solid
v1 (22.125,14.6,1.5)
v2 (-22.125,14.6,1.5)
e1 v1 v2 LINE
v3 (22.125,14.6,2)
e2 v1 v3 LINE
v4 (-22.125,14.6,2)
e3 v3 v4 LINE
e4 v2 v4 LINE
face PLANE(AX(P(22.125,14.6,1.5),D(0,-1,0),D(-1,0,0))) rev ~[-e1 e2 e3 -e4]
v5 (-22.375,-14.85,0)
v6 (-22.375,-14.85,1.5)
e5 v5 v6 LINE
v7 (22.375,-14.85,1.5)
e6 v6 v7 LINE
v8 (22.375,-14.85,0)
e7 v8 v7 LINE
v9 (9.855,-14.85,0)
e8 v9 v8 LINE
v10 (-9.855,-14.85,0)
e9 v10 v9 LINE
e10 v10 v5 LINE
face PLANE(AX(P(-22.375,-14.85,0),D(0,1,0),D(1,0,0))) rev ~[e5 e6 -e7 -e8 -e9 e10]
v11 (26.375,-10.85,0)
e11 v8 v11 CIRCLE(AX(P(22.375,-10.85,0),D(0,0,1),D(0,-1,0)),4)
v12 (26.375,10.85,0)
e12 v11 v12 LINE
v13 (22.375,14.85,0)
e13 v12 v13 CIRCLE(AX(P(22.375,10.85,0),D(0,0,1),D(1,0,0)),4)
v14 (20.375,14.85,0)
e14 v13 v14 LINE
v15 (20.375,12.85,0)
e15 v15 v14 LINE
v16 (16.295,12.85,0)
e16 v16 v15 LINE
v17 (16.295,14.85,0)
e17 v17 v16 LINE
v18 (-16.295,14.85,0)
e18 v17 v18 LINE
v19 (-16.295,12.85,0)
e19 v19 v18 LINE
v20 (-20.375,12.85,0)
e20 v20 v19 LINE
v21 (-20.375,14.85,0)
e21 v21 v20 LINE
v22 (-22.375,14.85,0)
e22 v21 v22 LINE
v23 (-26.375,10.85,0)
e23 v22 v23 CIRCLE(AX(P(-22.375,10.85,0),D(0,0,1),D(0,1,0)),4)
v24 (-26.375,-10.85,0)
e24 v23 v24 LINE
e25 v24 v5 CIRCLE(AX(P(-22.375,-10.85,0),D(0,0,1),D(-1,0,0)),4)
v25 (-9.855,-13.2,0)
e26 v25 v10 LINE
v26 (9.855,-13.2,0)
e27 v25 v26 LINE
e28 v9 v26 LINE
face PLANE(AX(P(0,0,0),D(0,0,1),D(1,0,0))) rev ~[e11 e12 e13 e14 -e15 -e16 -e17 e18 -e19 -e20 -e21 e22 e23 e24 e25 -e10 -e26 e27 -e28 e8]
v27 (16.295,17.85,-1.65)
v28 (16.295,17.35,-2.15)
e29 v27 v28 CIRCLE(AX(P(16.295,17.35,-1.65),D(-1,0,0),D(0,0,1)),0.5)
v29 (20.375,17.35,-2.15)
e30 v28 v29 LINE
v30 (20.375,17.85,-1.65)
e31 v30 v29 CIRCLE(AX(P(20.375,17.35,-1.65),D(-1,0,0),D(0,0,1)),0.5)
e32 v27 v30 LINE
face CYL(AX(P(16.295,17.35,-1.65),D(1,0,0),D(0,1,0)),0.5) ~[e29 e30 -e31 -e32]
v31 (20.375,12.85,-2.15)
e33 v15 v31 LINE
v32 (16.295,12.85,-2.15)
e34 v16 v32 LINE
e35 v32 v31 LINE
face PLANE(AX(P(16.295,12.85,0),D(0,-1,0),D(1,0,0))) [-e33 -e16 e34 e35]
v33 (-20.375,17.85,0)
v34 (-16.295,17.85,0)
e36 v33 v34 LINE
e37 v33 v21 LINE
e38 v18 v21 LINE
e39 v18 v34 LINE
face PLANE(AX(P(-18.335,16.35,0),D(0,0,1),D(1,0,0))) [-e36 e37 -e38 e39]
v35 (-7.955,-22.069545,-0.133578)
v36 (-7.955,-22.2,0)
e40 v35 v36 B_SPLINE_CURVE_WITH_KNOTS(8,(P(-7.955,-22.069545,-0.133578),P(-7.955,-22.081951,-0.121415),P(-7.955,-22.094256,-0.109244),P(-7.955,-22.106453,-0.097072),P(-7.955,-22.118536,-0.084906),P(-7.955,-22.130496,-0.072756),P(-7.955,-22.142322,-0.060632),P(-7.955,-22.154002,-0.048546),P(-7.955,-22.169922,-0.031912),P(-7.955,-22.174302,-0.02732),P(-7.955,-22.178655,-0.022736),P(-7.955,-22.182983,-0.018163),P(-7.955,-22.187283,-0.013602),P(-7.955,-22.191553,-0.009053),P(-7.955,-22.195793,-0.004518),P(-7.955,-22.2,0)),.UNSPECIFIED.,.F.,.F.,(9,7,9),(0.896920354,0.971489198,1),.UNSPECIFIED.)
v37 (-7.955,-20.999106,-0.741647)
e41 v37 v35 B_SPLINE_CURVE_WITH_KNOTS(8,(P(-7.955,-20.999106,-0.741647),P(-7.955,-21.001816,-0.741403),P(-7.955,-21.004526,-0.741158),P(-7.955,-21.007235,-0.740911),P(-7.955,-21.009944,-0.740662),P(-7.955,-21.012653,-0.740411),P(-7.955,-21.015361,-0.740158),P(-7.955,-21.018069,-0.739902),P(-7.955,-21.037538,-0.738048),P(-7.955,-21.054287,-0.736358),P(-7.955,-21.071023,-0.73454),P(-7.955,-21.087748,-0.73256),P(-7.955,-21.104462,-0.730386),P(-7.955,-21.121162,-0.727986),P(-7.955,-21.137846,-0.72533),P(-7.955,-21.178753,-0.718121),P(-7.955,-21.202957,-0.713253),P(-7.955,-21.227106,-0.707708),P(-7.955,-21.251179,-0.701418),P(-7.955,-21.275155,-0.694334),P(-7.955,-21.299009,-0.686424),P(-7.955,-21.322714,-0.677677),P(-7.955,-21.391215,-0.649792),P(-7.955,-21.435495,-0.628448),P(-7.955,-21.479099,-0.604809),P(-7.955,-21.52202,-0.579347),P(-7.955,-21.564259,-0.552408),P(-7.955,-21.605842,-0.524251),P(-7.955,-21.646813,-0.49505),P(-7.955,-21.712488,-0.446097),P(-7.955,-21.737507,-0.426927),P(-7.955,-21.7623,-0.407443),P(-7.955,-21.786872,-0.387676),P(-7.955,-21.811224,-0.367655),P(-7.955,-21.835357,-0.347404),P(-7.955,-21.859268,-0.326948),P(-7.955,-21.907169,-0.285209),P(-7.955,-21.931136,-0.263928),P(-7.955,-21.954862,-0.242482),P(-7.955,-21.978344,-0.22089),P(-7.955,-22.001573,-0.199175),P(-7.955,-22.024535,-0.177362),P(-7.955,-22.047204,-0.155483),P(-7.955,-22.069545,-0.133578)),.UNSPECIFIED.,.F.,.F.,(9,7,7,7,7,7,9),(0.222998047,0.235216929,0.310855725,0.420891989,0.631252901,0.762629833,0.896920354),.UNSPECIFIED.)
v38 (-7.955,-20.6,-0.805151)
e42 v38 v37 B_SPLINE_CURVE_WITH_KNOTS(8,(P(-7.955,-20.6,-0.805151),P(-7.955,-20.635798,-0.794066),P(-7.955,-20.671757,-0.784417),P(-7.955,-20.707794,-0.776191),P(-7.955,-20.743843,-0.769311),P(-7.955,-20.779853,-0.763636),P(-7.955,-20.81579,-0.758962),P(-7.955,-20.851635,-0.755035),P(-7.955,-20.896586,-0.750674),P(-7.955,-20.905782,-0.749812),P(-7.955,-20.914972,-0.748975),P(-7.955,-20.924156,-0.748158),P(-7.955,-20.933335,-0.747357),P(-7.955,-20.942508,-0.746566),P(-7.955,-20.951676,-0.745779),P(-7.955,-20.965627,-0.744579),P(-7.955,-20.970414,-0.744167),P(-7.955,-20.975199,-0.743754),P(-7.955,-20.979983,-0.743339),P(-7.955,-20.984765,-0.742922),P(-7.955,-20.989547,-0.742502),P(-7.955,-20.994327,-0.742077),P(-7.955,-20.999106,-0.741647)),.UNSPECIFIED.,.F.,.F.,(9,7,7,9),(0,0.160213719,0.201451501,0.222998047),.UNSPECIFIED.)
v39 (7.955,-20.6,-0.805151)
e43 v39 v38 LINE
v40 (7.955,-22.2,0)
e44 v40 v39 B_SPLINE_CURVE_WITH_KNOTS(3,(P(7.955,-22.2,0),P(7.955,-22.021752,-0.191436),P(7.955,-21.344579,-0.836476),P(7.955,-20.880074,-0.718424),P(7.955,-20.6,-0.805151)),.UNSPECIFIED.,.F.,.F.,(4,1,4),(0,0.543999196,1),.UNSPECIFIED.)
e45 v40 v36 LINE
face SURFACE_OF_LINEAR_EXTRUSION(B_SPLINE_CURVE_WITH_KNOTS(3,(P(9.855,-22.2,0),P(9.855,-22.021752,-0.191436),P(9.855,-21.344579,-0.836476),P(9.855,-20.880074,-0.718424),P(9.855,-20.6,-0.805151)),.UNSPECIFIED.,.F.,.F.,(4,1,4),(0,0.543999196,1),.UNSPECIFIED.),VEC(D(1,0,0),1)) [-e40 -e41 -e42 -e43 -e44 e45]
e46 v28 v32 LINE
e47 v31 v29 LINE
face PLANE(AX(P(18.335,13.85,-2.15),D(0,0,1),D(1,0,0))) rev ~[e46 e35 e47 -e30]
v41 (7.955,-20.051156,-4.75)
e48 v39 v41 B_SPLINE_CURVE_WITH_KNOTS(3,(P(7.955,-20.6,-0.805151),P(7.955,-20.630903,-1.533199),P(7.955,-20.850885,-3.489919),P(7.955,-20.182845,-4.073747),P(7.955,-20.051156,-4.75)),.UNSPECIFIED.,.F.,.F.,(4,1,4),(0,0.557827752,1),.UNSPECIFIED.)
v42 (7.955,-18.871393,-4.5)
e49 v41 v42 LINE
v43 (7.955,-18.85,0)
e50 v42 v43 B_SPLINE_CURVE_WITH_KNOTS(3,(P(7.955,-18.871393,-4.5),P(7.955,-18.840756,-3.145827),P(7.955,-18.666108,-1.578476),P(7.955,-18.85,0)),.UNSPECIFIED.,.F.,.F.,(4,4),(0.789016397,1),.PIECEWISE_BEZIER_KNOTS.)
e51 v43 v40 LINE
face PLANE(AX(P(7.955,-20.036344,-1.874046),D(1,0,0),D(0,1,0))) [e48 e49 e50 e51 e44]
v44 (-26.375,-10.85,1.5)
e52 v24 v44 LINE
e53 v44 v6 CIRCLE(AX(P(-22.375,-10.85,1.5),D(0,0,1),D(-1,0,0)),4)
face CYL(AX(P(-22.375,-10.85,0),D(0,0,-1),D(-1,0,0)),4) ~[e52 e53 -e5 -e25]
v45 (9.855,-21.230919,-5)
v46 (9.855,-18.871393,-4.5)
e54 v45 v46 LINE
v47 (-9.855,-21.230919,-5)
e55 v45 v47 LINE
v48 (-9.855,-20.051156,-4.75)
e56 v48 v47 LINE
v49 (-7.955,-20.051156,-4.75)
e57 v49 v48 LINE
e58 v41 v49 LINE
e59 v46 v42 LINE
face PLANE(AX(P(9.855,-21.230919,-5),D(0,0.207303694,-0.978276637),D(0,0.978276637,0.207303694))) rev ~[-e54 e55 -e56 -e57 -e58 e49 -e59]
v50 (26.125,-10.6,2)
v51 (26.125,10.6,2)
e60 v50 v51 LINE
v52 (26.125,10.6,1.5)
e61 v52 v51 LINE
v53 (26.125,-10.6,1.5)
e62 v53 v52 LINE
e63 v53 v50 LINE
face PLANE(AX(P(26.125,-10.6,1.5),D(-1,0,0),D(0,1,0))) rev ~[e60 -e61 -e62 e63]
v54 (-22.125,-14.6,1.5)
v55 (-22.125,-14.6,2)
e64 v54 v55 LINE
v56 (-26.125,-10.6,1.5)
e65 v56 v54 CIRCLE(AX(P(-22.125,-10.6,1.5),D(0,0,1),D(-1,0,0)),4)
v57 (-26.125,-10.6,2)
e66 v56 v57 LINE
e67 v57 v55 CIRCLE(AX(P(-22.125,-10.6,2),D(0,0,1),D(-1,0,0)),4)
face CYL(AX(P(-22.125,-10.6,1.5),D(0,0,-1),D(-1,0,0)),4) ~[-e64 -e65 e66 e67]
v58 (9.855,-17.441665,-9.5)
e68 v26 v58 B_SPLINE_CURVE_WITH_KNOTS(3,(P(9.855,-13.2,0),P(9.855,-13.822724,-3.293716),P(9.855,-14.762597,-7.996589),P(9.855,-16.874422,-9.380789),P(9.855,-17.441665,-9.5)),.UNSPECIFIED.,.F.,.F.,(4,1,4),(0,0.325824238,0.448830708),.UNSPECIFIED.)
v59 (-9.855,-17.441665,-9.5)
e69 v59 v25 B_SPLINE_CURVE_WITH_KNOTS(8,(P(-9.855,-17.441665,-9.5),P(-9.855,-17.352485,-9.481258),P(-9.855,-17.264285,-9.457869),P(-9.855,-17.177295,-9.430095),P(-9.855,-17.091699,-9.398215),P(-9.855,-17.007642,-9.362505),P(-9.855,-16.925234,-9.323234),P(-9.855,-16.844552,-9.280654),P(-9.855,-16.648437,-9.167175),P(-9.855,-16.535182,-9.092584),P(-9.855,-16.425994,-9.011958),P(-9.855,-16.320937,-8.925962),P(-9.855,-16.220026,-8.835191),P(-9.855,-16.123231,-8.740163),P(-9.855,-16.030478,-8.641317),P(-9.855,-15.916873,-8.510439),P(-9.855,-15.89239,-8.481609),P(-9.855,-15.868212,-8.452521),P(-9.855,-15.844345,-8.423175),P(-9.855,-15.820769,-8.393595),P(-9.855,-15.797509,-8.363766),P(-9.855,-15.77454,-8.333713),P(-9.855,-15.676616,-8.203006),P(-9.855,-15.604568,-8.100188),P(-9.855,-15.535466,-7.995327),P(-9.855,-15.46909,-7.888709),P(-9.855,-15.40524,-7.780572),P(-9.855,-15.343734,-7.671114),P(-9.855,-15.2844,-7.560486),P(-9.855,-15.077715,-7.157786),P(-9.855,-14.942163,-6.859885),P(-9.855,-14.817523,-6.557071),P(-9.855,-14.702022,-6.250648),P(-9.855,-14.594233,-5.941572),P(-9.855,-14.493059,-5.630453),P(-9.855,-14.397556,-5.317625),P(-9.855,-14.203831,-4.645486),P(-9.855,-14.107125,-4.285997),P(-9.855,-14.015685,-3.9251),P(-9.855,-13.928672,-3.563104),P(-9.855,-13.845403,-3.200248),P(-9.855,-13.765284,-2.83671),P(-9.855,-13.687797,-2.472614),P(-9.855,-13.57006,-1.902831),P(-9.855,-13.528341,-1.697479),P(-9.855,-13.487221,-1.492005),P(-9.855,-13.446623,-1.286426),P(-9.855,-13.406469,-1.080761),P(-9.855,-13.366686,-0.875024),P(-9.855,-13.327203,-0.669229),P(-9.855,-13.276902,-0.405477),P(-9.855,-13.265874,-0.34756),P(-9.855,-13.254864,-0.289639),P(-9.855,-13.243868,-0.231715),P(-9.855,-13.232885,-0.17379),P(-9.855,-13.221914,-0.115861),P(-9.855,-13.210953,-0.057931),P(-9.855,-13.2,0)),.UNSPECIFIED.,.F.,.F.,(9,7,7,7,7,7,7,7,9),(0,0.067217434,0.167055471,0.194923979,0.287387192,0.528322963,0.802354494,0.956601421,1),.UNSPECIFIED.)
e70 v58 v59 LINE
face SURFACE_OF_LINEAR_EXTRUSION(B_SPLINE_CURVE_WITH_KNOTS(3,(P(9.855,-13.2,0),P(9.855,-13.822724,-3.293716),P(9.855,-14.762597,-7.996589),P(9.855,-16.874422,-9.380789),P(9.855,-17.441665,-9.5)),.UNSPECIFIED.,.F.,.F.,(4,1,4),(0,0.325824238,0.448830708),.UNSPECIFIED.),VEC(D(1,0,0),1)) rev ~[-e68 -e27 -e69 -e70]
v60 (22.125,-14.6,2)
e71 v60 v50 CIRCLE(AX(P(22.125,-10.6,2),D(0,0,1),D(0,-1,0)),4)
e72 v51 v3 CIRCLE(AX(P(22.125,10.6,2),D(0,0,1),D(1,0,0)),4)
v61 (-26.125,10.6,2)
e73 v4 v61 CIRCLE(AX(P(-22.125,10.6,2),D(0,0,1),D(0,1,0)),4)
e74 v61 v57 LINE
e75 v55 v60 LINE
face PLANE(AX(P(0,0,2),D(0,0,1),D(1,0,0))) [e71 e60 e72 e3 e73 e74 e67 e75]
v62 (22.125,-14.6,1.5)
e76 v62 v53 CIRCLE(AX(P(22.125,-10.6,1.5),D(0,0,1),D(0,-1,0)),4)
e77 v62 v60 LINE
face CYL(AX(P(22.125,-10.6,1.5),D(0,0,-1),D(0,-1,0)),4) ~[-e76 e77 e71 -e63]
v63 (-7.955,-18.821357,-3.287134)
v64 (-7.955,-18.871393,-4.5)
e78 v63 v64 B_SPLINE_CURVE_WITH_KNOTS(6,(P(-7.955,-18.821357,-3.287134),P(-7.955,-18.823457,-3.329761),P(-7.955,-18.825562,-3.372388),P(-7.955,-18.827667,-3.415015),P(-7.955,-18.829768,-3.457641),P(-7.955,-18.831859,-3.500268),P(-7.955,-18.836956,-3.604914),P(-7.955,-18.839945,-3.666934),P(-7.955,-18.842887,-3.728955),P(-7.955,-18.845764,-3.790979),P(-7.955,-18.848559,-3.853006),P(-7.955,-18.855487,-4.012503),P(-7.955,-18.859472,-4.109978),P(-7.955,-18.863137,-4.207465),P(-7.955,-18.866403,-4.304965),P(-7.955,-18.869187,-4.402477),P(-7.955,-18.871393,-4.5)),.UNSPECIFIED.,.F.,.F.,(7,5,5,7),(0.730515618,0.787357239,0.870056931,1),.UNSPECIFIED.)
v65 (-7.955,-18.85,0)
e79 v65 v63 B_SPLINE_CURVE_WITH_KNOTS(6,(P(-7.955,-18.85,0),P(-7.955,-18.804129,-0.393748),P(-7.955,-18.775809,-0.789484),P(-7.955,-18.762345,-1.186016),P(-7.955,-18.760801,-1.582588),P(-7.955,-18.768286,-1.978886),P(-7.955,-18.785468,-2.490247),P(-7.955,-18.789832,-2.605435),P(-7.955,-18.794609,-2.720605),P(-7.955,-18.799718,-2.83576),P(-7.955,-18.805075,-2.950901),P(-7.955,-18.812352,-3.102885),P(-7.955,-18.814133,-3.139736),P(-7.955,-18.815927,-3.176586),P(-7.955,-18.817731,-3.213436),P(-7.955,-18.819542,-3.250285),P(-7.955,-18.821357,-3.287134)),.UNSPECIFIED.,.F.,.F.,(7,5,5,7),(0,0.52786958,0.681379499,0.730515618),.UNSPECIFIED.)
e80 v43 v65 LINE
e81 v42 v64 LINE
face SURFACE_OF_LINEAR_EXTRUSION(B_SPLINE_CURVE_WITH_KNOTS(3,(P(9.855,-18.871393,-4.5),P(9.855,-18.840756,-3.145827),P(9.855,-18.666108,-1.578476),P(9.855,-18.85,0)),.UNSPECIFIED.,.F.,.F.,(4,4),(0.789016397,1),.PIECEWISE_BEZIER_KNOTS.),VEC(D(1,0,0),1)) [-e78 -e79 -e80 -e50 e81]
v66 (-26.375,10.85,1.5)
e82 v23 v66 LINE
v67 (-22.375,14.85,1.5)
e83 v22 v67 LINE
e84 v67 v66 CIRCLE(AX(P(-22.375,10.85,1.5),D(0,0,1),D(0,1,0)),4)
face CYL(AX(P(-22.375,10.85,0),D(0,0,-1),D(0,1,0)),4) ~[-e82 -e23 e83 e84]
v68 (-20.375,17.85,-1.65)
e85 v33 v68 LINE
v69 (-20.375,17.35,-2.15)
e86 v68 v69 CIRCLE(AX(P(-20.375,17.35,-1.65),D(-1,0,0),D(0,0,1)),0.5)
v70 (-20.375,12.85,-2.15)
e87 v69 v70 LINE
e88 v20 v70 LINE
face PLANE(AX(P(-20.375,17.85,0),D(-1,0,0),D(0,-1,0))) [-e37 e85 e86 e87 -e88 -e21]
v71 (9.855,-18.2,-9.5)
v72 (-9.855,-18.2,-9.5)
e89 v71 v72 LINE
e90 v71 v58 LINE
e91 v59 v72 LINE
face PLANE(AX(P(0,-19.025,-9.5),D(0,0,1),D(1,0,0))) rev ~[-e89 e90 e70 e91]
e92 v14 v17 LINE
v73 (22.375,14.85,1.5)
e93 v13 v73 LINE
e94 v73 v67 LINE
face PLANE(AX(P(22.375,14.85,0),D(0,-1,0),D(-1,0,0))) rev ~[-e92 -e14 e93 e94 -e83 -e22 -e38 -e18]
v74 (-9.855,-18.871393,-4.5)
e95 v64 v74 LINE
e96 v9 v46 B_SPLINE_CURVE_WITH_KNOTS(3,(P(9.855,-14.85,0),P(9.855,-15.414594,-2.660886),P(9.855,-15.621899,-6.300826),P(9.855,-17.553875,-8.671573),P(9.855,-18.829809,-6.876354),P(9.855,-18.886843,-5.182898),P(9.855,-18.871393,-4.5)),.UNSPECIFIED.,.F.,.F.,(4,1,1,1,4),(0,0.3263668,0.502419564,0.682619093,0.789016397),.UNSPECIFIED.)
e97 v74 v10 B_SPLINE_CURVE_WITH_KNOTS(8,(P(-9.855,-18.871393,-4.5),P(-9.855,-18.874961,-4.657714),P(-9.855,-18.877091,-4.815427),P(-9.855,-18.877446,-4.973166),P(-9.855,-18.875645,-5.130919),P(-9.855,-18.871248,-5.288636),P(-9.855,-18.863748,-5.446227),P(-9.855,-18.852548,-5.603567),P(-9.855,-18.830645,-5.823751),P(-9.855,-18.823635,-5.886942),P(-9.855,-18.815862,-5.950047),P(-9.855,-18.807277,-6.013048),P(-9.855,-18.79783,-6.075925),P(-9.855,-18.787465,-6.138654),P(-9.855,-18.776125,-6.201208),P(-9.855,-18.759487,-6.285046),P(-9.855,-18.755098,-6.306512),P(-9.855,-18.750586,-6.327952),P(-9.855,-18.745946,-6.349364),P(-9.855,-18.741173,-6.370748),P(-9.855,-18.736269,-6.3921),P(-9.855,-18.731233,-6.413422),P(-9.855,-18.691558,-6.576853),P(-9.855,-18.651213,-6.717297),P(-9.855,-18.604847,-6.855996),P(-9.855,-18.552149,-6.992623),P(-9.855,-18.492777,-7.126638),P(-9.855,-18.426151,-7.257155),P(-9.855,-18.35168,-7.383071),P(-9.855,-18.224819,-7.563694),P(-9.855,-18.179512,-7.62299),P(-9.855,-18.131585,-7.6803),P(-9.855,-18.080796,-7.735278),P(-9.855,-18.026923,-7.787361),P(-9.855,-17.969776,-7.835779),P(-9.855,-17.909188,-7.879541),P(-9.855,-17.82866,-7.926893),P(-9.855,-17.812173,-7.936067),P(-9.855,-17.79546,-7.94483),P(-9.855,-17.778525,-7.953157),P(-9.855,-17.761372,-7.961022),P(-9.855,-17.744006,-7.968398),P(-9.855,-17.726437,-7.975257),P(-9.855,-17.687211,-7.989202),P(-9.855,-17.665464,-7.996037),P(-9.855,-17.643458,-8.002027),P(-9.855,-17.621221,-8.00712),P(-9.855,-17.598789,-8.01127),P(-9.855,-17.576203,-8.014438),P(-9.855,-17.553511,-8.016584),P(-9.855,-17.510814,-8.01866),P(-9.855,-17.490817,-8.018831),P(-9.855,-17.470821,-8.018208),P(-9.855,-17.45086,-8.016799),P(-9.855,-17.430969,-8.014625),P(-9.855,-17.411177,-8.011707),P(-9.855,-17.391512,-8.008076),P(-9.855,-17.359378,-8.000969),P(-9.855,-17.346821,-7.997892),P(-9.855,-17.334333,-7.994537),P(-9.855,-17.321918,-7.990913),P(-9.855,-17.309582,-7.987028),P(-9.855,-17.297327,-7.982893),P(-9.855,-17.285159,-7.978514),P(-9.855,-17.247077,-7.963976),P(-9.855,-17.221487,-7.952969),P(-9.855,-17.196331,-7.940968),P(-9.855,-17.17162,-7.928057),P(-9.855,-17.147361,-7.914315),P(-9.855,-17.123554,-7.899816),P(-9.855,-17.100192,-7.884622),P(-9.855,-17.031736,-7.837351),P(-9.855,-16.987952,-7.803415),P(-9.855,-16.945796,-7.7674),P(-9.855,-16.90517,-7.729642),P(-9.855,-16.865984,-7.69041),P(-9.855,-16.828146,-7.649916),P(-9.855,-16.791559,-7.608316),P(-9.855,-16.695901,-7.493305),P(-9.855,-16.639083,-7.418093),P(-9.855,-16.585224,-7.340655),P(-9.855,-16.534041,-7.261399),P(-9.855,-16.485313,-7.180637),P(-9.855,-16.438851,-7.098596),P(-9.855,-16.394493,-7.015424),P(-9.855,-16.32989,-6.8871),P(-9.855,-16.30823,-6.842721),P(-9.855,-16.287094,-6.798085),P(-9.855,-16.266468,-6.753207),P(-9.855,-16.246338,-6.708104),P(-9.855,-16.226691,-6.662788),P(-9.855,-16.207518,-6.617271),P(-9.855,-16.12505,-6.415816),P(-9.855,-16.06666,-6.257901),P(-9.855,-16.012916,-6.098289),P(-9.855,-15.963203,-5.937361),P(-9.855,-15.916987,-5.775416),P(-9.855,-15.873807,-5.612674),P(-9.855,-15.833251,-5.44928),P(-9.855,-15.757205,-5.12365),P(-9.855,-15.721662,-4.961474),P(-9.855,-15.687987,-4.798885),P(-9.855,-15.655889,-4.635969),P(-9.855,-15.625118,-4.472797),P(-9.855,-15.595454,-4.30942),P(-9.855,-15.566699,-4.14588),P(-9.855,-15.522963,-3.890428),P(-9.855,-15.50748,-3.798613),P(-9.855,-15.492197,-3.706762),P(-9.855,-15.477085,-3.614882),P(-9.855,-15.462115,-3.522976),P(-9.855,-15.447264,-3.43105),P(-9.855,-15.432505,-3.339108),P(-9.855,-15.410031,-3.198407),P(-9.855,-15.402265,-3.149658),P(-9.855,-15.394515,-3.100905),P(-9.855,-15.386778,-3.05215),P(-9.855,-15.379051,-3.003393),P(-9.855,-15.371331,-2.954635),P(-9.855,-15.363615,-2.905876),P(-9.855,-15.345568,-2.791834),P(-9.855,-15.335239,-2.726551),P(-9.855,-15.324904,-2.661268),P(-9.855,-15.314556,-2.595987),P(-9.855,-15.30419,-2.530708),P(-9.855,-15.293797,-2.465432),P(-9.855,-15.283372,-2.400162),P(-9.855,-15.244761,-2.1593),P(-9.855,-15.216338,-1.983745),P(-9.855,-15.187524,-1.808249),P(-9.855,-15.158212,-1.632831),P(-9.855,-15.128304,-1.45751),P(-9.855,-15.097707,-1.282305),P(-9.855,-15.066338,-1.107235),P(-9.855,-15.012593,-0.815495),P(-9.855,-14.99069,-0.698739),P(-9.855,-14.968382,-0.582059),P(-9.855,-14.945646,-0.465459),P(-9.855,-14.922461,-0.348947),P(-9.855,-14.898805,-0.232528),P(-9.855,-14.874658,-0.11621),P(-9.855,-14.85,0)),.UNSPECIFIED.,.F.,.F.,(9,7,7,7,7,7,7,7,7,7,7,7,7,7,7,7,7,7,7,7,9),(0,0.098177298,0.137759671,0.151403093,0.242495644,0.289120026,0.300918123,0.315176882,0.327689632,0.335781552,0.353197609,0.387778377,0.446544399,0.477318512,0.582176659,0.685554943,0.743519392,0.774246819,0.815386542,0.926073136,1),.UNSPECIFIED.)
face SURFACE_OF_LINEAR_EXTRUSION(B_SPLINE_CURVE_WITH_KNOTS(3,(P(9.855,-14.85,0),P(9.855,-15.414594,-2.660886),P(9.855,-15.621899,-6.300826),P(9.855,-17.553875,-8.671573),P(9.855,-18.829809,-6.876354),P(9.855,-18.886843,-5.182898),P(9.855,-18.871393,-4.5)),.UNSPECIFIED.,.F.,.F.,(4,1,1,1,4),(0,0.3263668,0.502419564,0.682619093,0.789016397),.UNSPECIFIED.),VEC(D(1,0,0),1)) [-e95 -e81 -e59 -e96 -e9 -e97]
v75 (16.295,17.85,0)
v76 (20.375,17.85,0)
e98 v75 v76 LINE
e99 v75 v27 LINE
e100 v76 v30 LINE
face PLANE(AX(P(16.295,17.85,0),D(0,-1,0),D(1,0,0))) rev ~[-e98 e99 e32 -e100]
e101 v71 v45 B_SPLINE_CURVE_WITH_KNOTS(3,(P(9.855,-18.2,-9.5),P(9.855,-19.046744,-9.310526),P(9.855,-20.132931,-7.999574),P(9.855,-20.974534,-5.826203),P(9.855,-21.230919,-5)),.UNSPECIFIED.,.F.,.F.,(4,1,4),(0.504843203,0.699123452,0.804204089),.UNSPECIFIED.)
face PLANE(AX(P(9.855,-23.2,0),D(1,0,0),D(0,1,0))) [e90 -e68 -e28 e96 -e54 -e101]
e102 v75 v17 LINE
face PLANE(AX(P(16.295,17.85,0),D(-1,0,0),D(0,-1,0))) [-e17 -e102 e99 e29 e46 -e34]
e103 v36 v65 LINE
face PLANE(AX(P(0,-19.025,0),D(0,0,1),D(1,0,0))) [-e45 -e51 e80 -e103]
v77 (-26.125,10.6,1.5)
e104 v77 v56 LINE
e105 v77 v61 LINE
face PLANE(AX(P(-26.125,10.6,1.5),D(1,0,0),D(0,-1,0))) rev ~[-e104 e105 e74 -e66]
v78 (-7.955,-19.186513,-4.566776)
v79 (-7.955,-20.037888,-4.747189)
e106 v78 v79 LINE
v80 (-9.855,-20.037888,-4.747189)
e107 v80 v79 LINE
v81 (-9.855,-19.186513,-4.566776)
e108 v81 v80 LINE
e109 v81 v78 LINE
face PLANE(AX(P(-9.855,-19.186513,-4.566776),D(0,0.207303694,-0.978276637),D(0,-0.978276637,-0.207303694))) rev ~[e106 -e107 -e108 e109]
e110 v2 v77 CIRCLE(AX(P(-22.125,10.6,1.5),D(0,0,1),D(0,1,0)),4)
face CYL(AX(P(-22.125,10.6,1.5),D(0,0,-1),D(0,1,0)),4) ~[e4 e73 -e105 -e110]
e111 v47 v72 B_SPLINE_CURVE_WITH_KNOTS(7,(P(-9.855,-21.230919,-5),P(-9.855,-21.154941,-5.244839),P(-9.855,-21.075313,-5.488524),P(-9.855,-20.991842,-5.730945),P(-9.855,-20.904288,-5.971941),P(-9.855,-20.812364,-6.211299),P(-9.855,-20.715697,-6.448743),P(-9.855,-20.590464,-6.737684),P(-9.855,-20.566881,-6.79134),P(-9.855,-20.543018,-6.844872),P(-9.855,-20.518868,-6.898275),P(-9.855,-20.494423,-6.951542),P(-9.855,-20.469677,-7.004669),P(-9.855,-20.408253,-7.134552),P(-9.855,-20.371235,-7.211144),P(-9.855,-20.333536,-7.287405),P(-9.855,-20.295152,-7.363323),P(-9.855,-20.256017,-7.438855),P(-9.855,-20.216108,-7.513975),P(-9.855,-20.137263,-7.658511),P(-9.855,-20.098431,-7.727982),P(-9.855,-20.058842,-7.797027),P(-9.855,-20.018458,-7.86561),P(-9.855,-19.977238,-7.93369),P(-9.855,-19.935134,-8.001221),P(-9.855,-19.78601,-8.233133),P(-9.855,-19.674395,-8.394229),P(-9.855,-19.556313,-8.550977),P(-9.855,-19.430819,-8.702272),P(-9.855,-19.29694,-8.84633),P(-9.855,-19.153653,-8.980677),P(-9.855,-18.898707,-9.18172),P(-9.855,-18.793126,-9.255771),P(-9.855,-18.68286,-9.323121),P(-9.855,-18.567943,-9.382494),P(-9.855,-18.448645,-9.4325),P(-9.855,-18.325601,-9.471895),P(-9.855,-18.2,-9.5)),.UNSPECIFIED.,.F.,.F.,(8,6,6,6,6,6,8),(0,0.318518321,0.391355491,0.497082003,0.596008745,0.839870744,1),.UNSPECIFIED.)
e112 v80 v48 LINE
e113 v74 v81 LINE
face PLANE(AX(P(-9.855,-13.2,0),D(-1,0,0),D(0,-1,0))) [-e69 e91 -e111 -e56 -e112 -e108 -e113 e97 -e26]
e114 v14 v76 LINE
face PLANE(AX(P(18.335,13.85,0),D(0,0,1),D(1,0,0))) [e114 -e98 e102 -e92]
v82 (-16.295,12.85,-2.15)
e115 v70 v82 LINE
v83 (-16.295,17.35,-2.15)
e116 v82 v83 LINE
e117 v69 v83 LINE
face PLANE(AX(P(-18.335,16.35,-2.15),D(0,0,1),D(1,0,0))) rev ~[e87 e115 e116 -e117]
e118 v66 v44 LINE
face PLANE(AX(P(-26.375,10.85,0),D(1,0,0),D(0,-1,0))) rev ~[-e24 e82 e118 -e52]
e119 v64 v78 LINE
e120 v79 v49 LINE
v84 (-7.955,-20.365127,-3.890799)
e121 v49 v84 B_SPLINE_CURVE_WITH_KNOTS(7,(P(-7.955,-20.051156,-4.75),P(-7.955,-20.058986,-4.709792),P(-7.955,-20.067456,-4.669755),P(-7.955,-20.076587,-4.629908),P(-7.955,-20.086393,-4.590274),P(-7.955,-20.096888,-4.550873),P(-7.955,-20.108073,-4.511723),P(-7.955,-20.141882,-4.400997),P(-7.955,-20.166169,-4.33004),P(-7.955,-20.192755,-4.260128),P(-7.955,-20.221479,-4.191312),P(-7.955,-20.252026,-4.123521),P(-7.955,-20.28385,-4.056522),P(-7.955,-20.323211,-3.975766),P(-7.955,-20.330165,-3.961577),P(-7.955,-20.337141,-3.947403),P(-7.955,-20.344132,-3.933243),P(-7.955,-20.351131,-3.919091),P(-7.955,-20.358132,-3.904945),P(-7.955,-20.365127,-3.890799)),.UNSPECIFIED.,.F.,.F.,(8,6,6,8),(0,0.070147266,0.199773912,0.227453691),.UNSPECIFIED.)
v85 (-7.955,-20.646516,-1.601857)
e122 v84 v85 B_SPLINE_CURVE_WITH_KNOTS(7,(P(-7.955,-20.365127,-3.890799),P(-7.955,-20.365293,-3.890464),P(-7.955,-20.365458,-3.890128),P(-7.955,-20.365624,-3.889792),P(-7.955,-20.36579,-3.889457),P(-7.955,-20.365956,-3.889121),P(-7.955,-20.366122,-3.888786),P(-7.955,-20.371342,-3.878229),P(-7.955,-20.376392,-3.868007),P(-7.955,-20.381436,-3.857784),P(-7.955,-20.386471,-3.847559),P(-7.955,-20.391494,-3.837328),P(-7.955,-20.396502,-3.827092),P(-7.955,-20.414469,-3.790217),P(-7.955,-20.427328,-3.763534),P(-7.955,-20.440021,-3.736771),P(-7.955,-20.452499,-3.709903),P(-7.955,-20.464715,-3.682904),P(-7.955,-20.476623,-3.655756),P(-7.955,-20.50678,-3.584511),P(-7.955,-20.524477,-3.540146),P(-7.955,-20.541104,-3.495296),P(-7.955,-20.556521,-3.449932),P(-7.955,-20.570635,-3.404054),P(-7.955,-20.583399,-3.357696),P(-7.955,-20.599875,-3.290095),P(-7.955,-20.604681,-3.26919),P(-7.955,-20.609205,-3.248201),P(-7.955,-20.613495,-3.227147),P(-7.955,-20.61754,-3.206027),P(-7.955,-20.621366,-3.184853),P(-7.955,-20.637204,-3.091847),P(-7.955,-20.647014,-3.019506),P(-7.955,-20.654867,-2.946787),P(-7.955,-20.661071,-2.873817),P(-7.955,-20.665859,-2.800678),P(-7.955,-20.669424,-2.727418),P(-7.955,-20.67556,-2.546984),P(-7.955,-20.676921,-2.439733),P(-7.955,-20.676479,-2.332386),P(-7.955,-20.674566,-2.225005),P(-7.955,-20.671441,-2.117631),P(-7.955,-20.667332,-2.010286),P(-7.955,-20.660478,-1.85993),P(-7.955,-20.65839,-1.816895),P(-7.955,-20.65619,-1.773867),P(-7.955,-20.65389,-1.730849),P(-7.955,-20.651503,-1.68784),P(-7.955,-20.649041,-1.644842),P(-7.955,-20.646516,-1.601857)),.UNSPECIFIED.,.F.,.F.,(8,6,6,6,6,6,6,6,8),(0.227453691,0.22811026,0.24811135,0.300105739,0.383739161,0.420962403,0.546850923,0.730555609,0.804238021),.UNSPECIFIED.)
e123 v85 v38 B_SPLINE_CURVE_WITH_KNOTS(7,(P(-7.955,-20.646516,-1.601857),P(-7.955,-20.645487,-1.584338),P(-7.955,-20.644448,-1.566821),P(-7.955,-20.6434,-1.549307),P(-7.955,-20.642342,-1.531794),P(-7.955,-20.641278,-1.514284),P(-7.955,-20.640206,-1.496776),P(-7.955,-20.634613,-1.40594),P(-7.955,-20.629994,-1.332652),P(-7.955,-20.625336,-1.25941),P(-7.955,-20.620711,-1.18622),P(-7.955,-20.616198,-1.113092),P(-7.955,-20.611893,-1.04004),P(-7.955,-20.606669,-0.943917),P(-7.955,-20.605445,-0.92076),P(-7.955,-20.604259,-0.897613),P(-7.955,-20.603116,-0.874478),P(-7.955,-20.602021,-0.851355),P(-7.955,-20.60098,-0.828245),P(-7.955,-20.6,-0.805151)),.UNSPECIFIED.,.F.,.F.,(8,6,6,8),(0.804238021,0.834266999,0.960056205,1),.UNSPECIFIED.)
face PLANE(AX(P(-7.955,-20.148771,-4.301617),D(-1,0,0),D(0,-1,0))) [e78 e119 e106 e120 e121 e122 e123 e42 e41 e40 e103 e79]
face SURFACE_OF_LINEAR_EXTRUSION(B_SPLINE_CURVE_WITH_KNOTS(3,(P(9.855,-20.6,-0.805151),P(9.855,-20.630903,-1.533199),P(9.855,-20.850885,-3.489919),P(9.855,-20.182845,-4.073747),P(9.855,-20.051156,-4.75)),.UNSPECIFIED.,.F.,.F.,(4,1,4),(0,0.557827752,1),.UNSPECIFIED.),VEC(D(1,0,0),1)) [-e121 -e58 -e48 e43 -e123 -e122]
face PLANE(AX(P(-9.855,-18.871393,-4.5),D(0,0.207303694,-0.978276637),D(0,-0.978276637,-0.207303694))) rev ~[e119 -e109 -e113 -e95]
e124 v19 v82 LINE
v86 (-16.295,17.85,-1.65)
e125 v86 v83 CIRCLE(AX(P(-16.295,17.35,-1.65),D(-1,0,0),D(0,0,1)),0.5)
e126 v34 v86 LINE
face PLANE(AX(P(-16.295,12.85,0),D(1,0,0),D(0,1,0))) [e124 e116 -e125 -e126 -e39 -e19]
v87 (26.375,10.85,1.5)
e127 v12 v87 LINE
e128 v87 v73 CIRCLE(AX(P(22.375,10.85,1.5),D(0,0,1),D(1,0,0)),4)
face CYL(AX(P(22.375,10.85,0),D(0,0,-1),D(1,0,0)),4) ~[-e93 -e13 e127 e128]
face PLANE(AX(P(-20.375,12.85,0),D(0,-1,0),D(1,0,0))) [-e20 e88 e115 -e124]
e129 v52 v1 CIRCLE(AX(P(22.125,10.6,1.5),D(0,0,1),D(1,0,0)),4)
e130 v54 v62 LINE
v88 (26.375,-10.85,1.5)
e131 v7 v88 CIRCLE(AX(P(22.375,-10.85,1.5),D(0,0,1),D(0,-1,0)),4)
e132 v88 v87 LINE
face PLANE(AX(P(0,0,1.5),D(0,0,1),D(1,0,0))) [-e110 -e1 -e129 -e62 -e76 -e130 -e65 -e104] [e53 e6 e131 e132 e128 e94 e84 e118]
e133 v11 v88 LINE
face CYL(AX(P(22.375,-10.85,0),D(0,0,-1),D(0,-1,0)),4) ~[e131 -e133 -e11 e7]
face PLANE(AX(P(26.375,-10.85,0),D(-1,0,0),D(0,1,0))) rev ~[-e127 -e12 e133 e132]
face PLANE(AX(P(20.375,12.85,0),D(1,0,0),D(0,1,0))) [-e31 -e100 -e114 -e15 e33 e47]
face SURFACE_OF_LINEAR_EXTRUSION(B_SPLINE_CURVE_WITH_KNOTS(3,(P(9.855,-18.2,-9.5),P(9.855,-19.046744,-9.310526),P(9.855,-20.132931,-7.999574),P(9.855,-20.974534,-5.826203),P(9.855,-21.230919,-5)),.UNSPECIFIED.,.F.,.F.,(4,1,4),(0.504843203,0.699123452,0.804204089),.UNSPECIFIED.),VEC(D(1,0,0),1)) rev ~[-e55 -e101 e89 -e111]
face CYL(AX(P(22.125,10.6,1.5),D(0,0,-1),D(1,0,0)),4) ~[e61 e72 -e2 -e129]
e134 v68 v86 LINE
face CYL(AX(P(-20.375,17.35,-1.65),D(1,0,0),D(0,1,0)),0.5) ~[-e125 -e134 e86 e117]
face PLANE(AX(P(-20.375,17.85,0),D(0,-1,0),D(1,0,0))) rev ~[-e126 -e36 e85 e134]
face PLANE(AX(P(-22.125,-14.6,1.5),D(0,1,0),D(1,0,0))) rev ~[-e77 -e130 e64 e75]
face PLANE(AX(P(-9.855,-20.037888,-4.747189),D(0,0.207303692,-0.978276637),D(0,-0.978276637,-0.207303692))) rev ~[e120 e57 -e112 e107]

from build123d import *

# Parameters (mm, degrees)
F1_DEPTH  = 1.5
F3_DEPTH  = 0.5
F4_W      = 4.08
F4_H      = 3
F4_H_2    = 2
F5_DEPTH  = 2.15
F4_W_2    = 19.71
F4_H_3    = 8.35
F4_H_4    = 1.65
F6_DEPTH  = 9.5
F8_DEPTH  = 25.4
F9_DEPTH  = 25.4
F10_DEPTH = 25.4
F11_DEPTH = 25.4
F12_DEPTH = 1.9
F14_DEPTH = 1.9
F15_R     = 0.5


with BuildPart() as f1:
    # F0 (on Top) → F1 (new body)
    with BuildSketch(Plane.XY):
        with BuildLine():
            ThreePointArc((26.375, 10.85), (25.2034271247, 13.6784271247), (22.375, 14.85))
            Line((22.375, 14.85), (-22.375, 14.85))
            ThreePointArc((-22.375, 14.85), (-25.2034271247, 13.6784271247), (-26.375, 10.85))
            Line((-26.375, 10.85), (-26.375, -10.85))
            ThreePointArc((-26.375, -10.85), (-25.2034271247, -13.6784271247), (-22.375, -14.85))
            Line((-22.375, -14.85), (22.375, -14.85))
            ThreePointArc((22.375, -14.85), (25.2034271247, -13.6784271247), (26.375, -10.85))
            Line((26.375, -10.85), (26.375, 10.85))
        make_face()
    extrude(amount=F1_DEPTH)

    # F2 (on face) → F3 (join)
    with BuildSketch(Plane.XY.offset(1.5)):
        with BuildLine():
            ThreePointArc((26.125, 10.6), (24.9534271247, 13.4284271247), (22.125, 14.6))
            Line((22.125, 14.6), (-22.125, 14.6))
            ThreePointArc((-22.125, 14.6), (-24.9534271247, 13.4284271247), (-26.125, 10.6))
            Line((-26.125, 10.6), (-26.125, -10.6))
            ThreePointArc((-26.125, -10.6), (-24.9534271247, -13.4284271247), (-22.125, -14.6))
            Line((-22.125, -14.6), (22.125, -14.6))
            ThreePointArc((22.125, -14.6), (24.9534271247, -13.4284271247), (26.125, -10.6))
            Line((26.125, -10.6), (26.125, 10.6))
        make_face()
    extrude(amount=F3_DEPTH)

    # F4 (on face) → F5 (join)
    with BuildSketch(Plane.XY):
        with Locations((-18.335, 16.35)):
            Rectangle(F4_W, F4_H)
        with Locations((-18.335, 13.85)):
            Rectangle(F4_W, F4_H_2)
        with Locations((18.335, 13.85)):
            Rectangle(F4_W, F4_H_2)
        with Locations((18.335, 16.35)):
            Rectangle(F4_W, F4_H)
    extrude(amount=-F5_DEPTH)

    # F4 (on face) → F6 (join)
    with BuildSketch(Plane.XY):
        with Locations((0, -19.025)):
            Rectangle(F4_W_2, F4_H_3)
        with Locations((0, -14.025)):
            Rectangle(F4_W_2, F4_H_4)
    extrude(amount=-F6_DEPTH)

    # F7 (on face) → F8 (cut)
    with BuildSketch(Plane.YZ.offset(9.855)):
        with BuildLine():
            add(Edge.make_bspline(
                [(-18.2, -9.5), (-19.0467439554, -9.3105263347), (-20.1329314913, -7.9995740948), (-20.9745336298, -5.8262032925), (-21.2309185806, -5)],
                knots=[0.5048432027, 0.5048432027, 0.5048432027, 0.5048432027, 0.6991234522, 0.8042040894, 0.8042040894, 0.8042040894, 0.8042040894], degree=3))
            add(Edge.make_bspline(
                [(-21.2309185806, -5), (-21.7086386079, -3.4605420158), (-22.0508473288, -1.7012665692), (-22.2, 0)],
                knots=[0.8042040894, 0.8042040894, 0.8042040894, 0.8042040894, 1, 1, 1, 1], degree=3))
            Line((-22.2, 0), (-23.2, 0))
            Line((-23.2, 0), (-23.2, -9.5))
            Line((-23.2, -9.5), (-18.2, -9.5))
        make_face()
    extrude(amount=-F8_DEPTH, mode=Mode.SUBTRACT)

    # F7 (on face) → F9 (cut)
    with BuildSketch(Plane.YZ.offset(9.855)):
        with BuildLine():
            Line((-14.85, 0), (-18.85, 0))
            add(Edge.make_bspline(
                [(-18.8713932454, -4.5), (-18.8407563671, -3.1458271018), (-18.6661081701, -1.5784759436), (-18.85, 0)],
                knots=[0.789016397, 0.789016397, 0.789016397, 0.789016397, 1, 1, 1, 1], degree=3))
            add(Edge.make_bspline(
                [(-14.85, 0), (-15.4145938047, -2.6608863681), (-15.6218993367, -6.3008263141), (-17.5538748145, -8.6715731519), (-18.8298088893, -6.876353813), (-18.8868431725, -5.1828983108), (-18.8713932454, -4.5)],
                knots=[0, 0, 0, 0, 0.3263667999, 0.5024195639, 0.6826190926, 0.789016397, 0.789016397, 0.789016397, 0.789016397], degree=3))
        make_face()
    extrude(amount=-F9_DEPTH, mode=Mode.SUBTRACT)

    # F7 (on face) → F10 (cut)
    with BuildSketch(Plane.YZ.offset(9.855)):
        with BuildLine():
            add(Edge.make_bspline(
                [(-13.2, 0), (-13.822723688, -3.2937158649), (-14.7625971483, -7.9965886058), (-16.8744215828, -9.380788847), (-17.4416645725, -9.5)],
                knots=[0, 0, 0, 0, 0.3258242382, 0.4488307078, 0.4488307078, 0.4488307078, 0.4488307078], degree=3))
            Line((-17.4416645725, -9.5), (-13.2, -9.5))
            Line((-13.2, -9.5), (-13.2, 0))
        make_face()
    extrude(amount=-F10_DEPTH, mode=Mode.SUBTRACT)

    # F7 (on face) → F11 (cut)
    with BuildSketch(Plane.YZ.offset(9.855)):
        with BuildLine():
            add(Edge.make_bspline(
                [(-21.2309185806, -5), (-21.7086386079, -3.4605420158), (-22.0508473288, -1.7012665692), (-22.2, 0)],
                knots=[0.8042040894, 0.8042040894, 0.8042040894, 0.8042040894, 1, 1, 1, 1], degree=3))
            Line((-21.2309185806, -5), (-20.051155913, -4.75))
            add(Edge.make_bspline(
                [(-20.6, -0.8051507757), (-20.6309029539, -1.5331994881), (-20.8508854026, -3.4899190921), (-20.1828452771, -4.0737474943), (-20.051155913, -4.75)],
                knots=[0, 0, 0, 0, 0.5578277519, 1, 1, 1, 1], degree=3))
            add(Edge.make_bspline(
                [(-22.2, 0), (-22.021752265, -0.1914355168), (-21.34457939, -0.8364756071), (-20.8800740764, -0.7184244385), (-20.6, -0.8051507757)],
                knots=[0, 0, 0, 0, 0.5439991963, 1, 1, 1, 1], degree=3))
        make_face()
    extrude(amount=-F11_DEPTH, mode=Mode.SUBTRACT)

    # F7 (on face) → F12 (cut)
    with BuildSketch(Plane.YZ.offset(9.855)):
        with BuildLine():
            Line((-18.85, 0), (-22.2, 0))
            add(Edge.make_bspline(
                [(-22.2, 0), (-22.021752265, -0.1914355168), (-21.34457939, -0.8364756071), (-20.8800740764, -0.7184244385), (-20.6, -0.8051507757)],
                knots=[0, 0, 0, 0, 0.5439991963, 1, 1, 1, 1], degree=3))
            add(Edge.make_bspline(
                [(-20.6, -0.8051507757), (-20.6309029539, -1.5331994881), (-20.8508854026, -3.4899190921), (-20.1828452771, -4.0737474943), (-20.051155913, -4.75)],
                knots=[0, 0, 0, 0, 0.5578277519, 1, 1, 1, 1], degree=3))
            Line((-20.051155913, -4.75), (-18.8713932454, -4.5))
            add(Edge.make_bspline(
                [(-18.8713932454, -4.5), (-18.8407563671, -3.1458271018), (-18.6661081701, -1.5784759436), (-18.85, 0)],
                knots=[0.789016397, 0.789016397, 0.789016397, 0.789016397, 1, 1, 1, 1], degree=3))
        make_face()
    extrude(amount=-F12_DEPTH, mode=Mode.SUBTRACT)

    # F13 (on face) → F14 (cut)
    with BuildSketch(Plane(origin=(-9.855, 0, 0), x_dir=(0, -1, 0), z_dir=(-1, 0, 0))):
        with BuildLine():
            Line((20.0378884491, -4.7471885312), (20.051155913, -4.75))
            add(Edge.make_bspline(
                [(20.051155913, -4.75), (20.0589857611, -4.7097920877), (20.0674564332, -4.6697547253), (20.0765868052, -4.629908391), (20.0863933528, -4.5902740901), (20.0968875724, -4.5508725034), (20.1080734026, -4.5117231353), (20.1418817725, -4.4009968751), (20.1661686112, -4.3300403811), (20.1927551228, -4.2601282228), (20.2214794477, -4.1913122549), (20.2520262571, -4.1235210989), (20.2838500374, -4.0565219368), (20.3232108532, -3.9757663577), (20.3301650097, -3.9615765963), (20.3371409196, -3.9474033553), (20.3441319527, -3.9332429305), (20.3511312875, -3.9190914551), (20.3581319113, -3.9049448998), (20.3651266201, -3.8907990727)],
                knots=[0, 0, 0, 0, 0, 0, 0, 0, 0.0701472659, 0.0701472659, 0.0701472659, 0.0701472659, 0.0701472659, 0.0701472659, 0.1997739124, 0.1997739124, 0.1997739124, 0.1997739124, 0.1997739124, 0.1997739124, 0.227453691, 0.227453691, 0.227453691, 0.227453691, 0.227453691, 0.227453691, 0.227453691, 0.227453691], degree=7))
            add(Edge.make_bspline(
                [(20.3651266201, -3.8907990727), (20.2923732044, -3.9469893956), (20.0498312814, -4.1600578166), (19.9785290709, -4.465871509), (20.0378884491, -4.7471885312)],
                knots=[3.3352473479, 3.3352473479, 3.3352473479, 3.3352473479, 3.6014620339, 4.288683164, 4.288683164, 4.288683164, 4.288683164], degree=3))
        make_face()
        with BuildLine():
            Line((19.1865132018, -4.5667761333), (20.0378884491, -4.7471885312))
            add(Edge.make_bspline(
                [(20.3651266201, -3.8907990727), (20.2923732044, -3.9469893956), (20.0498312814, -4.1600578166), (19.9785290709, -4.465871509), (20.0378884491, -4.7471885312)],
                knots=[3.3352473479, 3.3352473479, 3.3352473479, 3.3352473479, 3.6014620339, 4.288683164, 4.288683164, 4.288683164, 4.288683164], degree=3))
            add(Edge.make_bspline(
                [(20.3651266201, -3.8907990727), (20.3652925358, -3.8904635312), (20.3654584482, -3.8901279902), (20.3656243571, -3.8897924495), (20.3657902625, -3.889456909), (20.3659561644, -3.8891213689), (20.3661220625, -3.8887858289), (20.3713416007, -3.8782287262), (20.3763917236, -3.8680073132), (20.3814356082, -3.8577844748), (20.3864705184, -3.8475586358), (20.3914936992, -3.8373282211), (20.3965023768, -3.8270916558), (20.4144692424, -3.7902165332), (20.4273277463, -3.7635338368), (20.4400206781, -3.7367712884), (20.4524989775, -3.709902642), (20.4647148079, -3.6829043352), (20.4766232471, -3.655756431), (20.5067795166, -3.5845105727), (20.5244774515, -3.5401460021), (20.541104477, -3.4952960694), (20.5565213512, -3.4499316007), (20.5706349892, -3.4040539743), (20.5833986563, -3.3576957084), (20.5998748454, -3.2900950162), (20.6046813043, -3.2691903931), (20.609204773, -3.2482009599), (20.6134948517, -3.227146708), (20.6175398341, -3.2060269198), (20.6213657385, -3.1848526801), (20.6372039955, -3.091846631), (20.6470136755, -3.0195059493), (20.6548666939, -2.9467874693), (20.6610708494, -2.8738168031), (20.6658588693, -2.8006775838), (20.6694244023, -2.7274178583), (20.6755601658, -2.5469844123), (20.6769210939, -2.4397334438), (20.6764794737, -2.3323859939), (20.6745662387, -2.2250049078), (20.6714409356, -2.1176310351), (20.6673316749, -2.0102860121), (20.660478022, -1.8599303262), (20.6583902963, -1.8168947561), (20.6561900649, -1.7738671435), (20.6538900562, -1.7308485214), (20.6515027419, -1.6878398889), (20.649040571, -1.6448422291), (20.6465162034, -1.6018565276)],
                knots=[0.227453691, 0.227453691, 0.227453691, 0.227453691, 0.227453691, 0.227453691, 0.227453691, 0.227453691, 0.2281102601, 0.2281102601, 0.2281102601, 0.2281102601, 0.2281102601, 0.2281102601, 0.24811135, 0.24811135, 0.24811135, 0.24811135, 0.24811135, 0.24811135, 0.3001057386, 0.3001057386, 0.3001057386, 0.3001057386, 0.3001057386, 0.3001057386, 0.3837391607, 0.3837391607, 0.3837391607, 0.3837391607, 0.3837391607, 0.3837391607, 0.4209624028, 0.4209624028, 0.4209624028, 0.4209624028, 0.4209624028, 0.4209624028, 0.5468509231, 0.5468509231, 0.5468509231, 0.5468509231, 0.5468509231, 0.5468509231, 0.7305556094, 0.7305556094, 0.7305556094, 0.7305556094, 0.7305556094, 0.7305556094, 0.8042380207, 0.8042380207, 0.8042380207, 0.8042380207, 0.8042380207, 0.8042380207, 0.8042380207, 0.8042380207], degree=7))
            add(Edge.make_bspline(
                [(20.6, -0.8051507757), (20.5613649055, -1.0322758666), (20.5772163889, -1.2973036751), (20.6410101063, -1.5787167701), (20.6465162034, -1.6018565276)],
                knots=[0, 0, 0, 0, 0.7282402744, 0.7931964139, 0.7931964139, 0.7931964139, 0.7931964139], degree=3))
            add(Edge.make_bspline(
                [(20.9991057889, -0.7416468993), (20.9592728425, -0.7301565498), (20.8220313096, -0.699983524), (20.6903609526, -0.7384588517), (20.6, -0.8051507757)],
                knots=[1.5561655905, 1.5561655905, 1.5561655905, 1.5561655905, 1.6760652117, 1.9692595941, 1.9692595941, 1.9692595941, 1.9692595941], degree=3))
            add(Edge.make_bspline(
                [(20.9991057889, -0.7416468993), (21.0018159449, -0.7414031777), (21.0045257326, -0.7411578671), (21.0072351577, -0.740910824), (21.0099442255, -0.7406619047), (21.0126529413, -0.7404109655), (21.0153613103, -0.7401578625), (21.0180693376, -0.7399024515), (21.0375384991, -0.7380483329), (21.0542867078, -0.7363581789), (21.0710231722, -0.7345401107), (21.0877483889, -0.7325603549), (21.104461824, -0.7303860252), (21.1211619051, -0.7279857666), (21.137846013, -0.7253304002), (21.1787532558, -0.7181211815), (21.2029571594, -0.7132526524), (21.22710557, -0.7077075247), (21.251178971, -0.7014182819), (21.2751551853, -0.6943343572), (21.2990094679, -0.6864244774), (21.3227144456, -0.6776773383), (21.3912145071, -0.6497923866), (21.43549452, -0.628448223), (21.4790992276, -0.6048089523), (21.5220195614, -0.5793468432), (21.5642587373, -0.5524077139), (21.6058418345, -0.5242508404), (21.6468131809, -0.4950496177), (21.7124884675, -0.4460965112), (21.737506514, -0.4269266559), (21.7622997408, -0.4074426066), (21.7868715943, -0.3876760423), (21.8112238209, -0.36765495), (21.835356514, -0.3474044919), (21.8592681613, -0.3269478723), (21.9071685483, -0.285208783), (21.9311359694, -0.2639277816), (21.9548620733, -0.2424817194), (21.9783439347, -0.2208903242), (22.0015734403, -0.1991751296), (22.0245346788, -0.1773623394), (22.0472039759, -0.1554833002), (22.0695454706, -0.1335784594)],
                knots=[0.2229980472, 0.2229980472, 0.2229980472, 0.2229980472, 0.2229980472, 0.2229980472, 0.2229980472, 0.2229980472, 0.2229980472, 0.235216929, 0.235216929, 0.235216929, 0.235216929, 0.235216929, 0.235216929, 0.235216929, 0.310855725, 0.310855725, 0.310855725, 0.310855725, 0.310855725, 0.310855725, 0.310855725, 0.4208919894, 0.4208919894, 0.4208919894, 0.4208919894, 0.4208919894, 0.4208919894, 0.4208919894, 0.6312529006, 0.6312529006, 0.6312529006, 0.6312529006, 0.6312529006, 0.6312529006, 0.6312529006, 0.7626298331, 0.7626298331, 0.7626298331, 0.7626298331, 0.7626298331, 0.7626298331, 0.7626298331, 0.8969203539, 0.8969203539, 0.8969203539, 0.8969203539, 0.8969203539, 0.8969203539, 0.8969203539, 0.8969203539, 0.8969203539], degree=8))
            add(Edge.make_bspline(
                [(22.2, 0), (22.1557451499, -0.0395755652), (22.1122969775, -0.0840429257), (22.0695454706, -0.1335784594)],
                knots=[0, 0, 0, 0, 0.1902494763, 0.1902494763, 0.1902494763, 0.1902494763], degree=3))
            Line((22.2, 0), (18.85, 0))
            add(Edge.make_bspline(
                [(18.85, 0), (18.8041285234, -0.3937479028), (18.7758085808, -0.7894835109), (18.7623451707, -1.1860157865), (18.7608009494, -1.5825878818), (18.7682857506, -1.9788864083), (18.785468482, -2.4902466637), (18.7898321752, -2.6054346786), (18.7946093212, -2.7206051301), (18.799718478, -2.8357595323), (18.8050745896, -2.9509007431), (18.8123523874, -3.1028850541), (18.8141331269, -3.1397361515), (18.8159270051, -3.1765864439), (18.8177310212, -3.2134360696), (18.8195421073, -3.2502851717), (18.8213571287, -3.2871338975)],
                knots=[0, 0, 0, 0, 0, 0, 0, 0.5278695798, 0.5278695798, 0.5278695798, 0.5278695798, 0.5278695798, 0.6813794986, 0.6813794986, 0.6813794986, 0.6813794986, 0.6813794986, 0.7305156181, 0.7305156181, 0.7305156181, 0.7305156181, 0.7305156181, 0.7305156181, 0.7305156181], degree=6))
            add(Edge.make_bspline(
                [(19.1865132018, -4.5667761333), (19.0849025154, -4.1217046012), (18.9454363675, -3.7042708733), (18.8213571287, -3.2871338975)],
                knots=[15.3483435034, 15.3483435034, 15.3483435034, 15.3483435034, 16.7073787198, 16.7073787198, 16.7073787198, 16.7073787198], degree=3))
        make_face()
        with BuildLine():
            Line((18.8713932454, -4.5), (19.1865132018, -4.5667761333))
            add(Edge.make_bspline(
                [(19.1865132018, -4.5667761333), (19.0849025154, -4.1217046012), (18.9454363675, -3.7042708733), (18.8213571287, -3.2871338975)],
                knots=[15.3483435034, 15.3483435034, 15.3483435034, 15.3483435034, 16.7073787198, 16.7073787198, 16.7073787198, 16.7073787198], degree=3))
            add(Edge.make_bspline(
                [(18.8213571287, -3.2871338975), (18.8234567809, -3.3297612222), (18.8255616994, -3.3723880433), (18.8276670315, -3.4150145889), (18.8297678045, -3.4576410948), (18.8318589258, -3.5002678049), (18.8369559593, -3.6049138465), (18.8399452005, -3.6669336481), (18.8428868298, -3.7289551465), (18.8457639747, -3.7909790554), (18.8485589666, -3.8530060314), (18.8554869159, -4.0125032039), (18.8594720136, -4.1099784592), (18.8631366493, -4.2074652335), (18.8664032639, -4.3049647894), (18.8691868781, -4.4024769185), (18.8713932454, -4.5)],
                knots=[0.7305156181, 0.7305156181, 0.7305156181, 0.7305156181, 0.7305156181, 0.7305156181, 0.7305156181, 0.7873572394, 0.7873572394, 0.7873572394, 0.7873572394, 0.7873572394, 0.8700569312, 0.8700569312, 0.8700569312, 0.8700569312, 0.8700569312, 1, 1, 1, 1, 1, 1, 1], degree=6))
        make_face()
        with BuildLine():
            add(Edge.make_bspline(
                [(20.6, -0.8051507757), (20.5613649055, -1.0322758666), (20.5772163889, -1.2973036751), (20.6410101063, -1.5787167701), (20.6465162034, -1.6018565276)],
                knots=[0, 0, 0, 0, 0.7282402744, 0.7931964139, 0.7931964139, 0.7931964139, 0.7931964139], degree=3))
            add(Edge.make_bspline(
                [(20.6465162034, -1.6018565276), (20.6454874073, -1.5843378735), (20.6444482807, -1.5668212056), (20.6433996806, -1.5493065906), (20.6423424697, -1.5317940952), (20.6412775194, -1.5142837865), (20.6402057118, -1.496775732), (20.6346132485, -1.4059397594), (20.6299941701, -1.3326518291), (20.6253361607, -1.2594097858), (20.6207110068, -1.1862201726), (20.6161978814, -1.1130924918), (20.6118930639, -1.0400403627), (20.6066693408, -0.9439168342), (20.6054447252, -0.9207596352), (20.6042585866, -0.8976129266), (20.6031155769, -0.8744775635), (20.6020208919, -0.8513545797), (20.6009802717, -0.8282451869), (20.6, -0.8051507757)],
                knots=[0.8042380207, 0.8042380207, 0.8042380207, 0.8042380207, 0.8042380207, 0.8042380207, 0.8042380207, 0.8042380207, 0.8342669986, 0.8342669986, 0.8342669986, 0.8342669986, 0.8342669986, 0.8342669986, 0.9600562049, 0.9600562049, 0.9600562049, 0.9600562049, 0.9600562049, 0.9600562049, 1, 1, 1, 1, 1, 1, 1, 1], degree=7))
        make_face()
        with BuildLine():
            add(Edge.make_bspline(
                [(20.9991057889, -0.7416468993), (20.9592728425, -0.7301565498), (20.8220313096, -0.699983524), (20.6903609526, -0.7384588517), (20.6, -0.8051507757)],
                knots=[1.5561655905, 1.5561655905, 1.5561655905, 1.5561655905, 1.6760652117, 1.9692595941, 1.9692595941, 1.9692595941, 1.9692595941], degree=3))
            add(Edge.make_bspline(
                [(20.6, -0.8051507757), (20.6357983312, -0.7940656436), (20.6717568885, -0.7844174379), (20.7077937642, -0.7761910472), (20.7438427247, -0.7693108375), (20.7798531645, -0.7636357507), (20.8157901974, -0.7589622849), (20.8516348851, -0.7550353533), (20.8965863081, -0.7506743043), (20.9057821139, -0.7498119471), (20.9149720884, -0.748974999), (20.9241563382, -0.7481584013), (20.93333501, -0.7473569911), (20.9425082907, -0.7465655013), (20.9516764072, -0.7457785607), (20.9656273652, -0.7445790375), (20.9704137565, -0.7441671385), (20.9751988374, -0.7437542175), (20.9799826436, -0.7433394936), (20.9847652094, -0.7429221844), (20.9895465679, -0.7425015061), (20.9943267509, -0.7420766732), (20.9991057889, -0.7416468993)],
                knots=[0, 0, 0, 0, 0, 0, 0, 0, 0, 0.1602137189, 0.1602137189, 0.1602137189, 0.1602137189, 0.1602137189, 0.1602137189, 0.1602137189, 0.2014515012, 0.2014515012, 0.2014515012, 0.2014515012, 0.2014515012, 0.2014515012, 0.2014515012, 0.2229980472, 0.2229980472, 0.2229980472, 0.2229980472, 0.2229980472, 0.2229980472, 0.2229980472, 0.2229980472, 0.2229980472], degree=8))
        make_face()
        with BuildLine():
            add(Edge.make_bspline(
                [(22.0695454706, -0.1335784594), (22.0819512565, -0.1214151387), (22.0942559691, -0.1092438625), (22.1064534685, -0.0970715557), (22.1185364564, -0.0849060086), (22.130496242, -0.0727560855), (22.1423223785, -0.0606320358), (22.1540020519, -0.0485460024), (22.1699223859, -0.0319121785), (22.1743015208, -0.0273196696), (22.1786553865, -0.0227363366), (22.1829828315, -0.0181632572), (22.1872825506, -0.013601651), (22.1915530853, -0.0090528797), (22.1957928235, -0.0045184474), (22.2, 0)],
                knots=[0.8969203539, 0.8969203539, 0.8969203539, 0.8969203539, 0.8969203539, 0.8969203539, 0.8969203539, 0.8969203539, 0.8969203539, 0.9714891983, 0.9714891983, 0.9714891983, 0.9714891983, 0.9714891983, 0.9714891983, 0.9714891983, 1, 1, 1, 1, 1, 1, 1, 1, 1], degree=8))
            add(Edge.make_bspline(
                [(22.2, 0), (22.1557451499, -0.0395755652), (22.1122969775, -0.0840429257), (22.0695454706, -0.1335784594)],
                knots=[0, 0, 0, 0, 0.1902494763, 0.1902494763, 0.1902494763, 0.1902494763], degree=3))
        make_face()
    extrude(amount=-F14_DEPTH, mode=Mode.SUBTRACT)

    # F15
    f15_edges = [f1.edges().sort_by_distance(p)[0] for p in [
        (18.335, 17.85, -2.15),
        (-18.335, 17.85, -2.15),
    ]]
    fillet(f15_edges, radius=F15_R)


solid = f1.part
